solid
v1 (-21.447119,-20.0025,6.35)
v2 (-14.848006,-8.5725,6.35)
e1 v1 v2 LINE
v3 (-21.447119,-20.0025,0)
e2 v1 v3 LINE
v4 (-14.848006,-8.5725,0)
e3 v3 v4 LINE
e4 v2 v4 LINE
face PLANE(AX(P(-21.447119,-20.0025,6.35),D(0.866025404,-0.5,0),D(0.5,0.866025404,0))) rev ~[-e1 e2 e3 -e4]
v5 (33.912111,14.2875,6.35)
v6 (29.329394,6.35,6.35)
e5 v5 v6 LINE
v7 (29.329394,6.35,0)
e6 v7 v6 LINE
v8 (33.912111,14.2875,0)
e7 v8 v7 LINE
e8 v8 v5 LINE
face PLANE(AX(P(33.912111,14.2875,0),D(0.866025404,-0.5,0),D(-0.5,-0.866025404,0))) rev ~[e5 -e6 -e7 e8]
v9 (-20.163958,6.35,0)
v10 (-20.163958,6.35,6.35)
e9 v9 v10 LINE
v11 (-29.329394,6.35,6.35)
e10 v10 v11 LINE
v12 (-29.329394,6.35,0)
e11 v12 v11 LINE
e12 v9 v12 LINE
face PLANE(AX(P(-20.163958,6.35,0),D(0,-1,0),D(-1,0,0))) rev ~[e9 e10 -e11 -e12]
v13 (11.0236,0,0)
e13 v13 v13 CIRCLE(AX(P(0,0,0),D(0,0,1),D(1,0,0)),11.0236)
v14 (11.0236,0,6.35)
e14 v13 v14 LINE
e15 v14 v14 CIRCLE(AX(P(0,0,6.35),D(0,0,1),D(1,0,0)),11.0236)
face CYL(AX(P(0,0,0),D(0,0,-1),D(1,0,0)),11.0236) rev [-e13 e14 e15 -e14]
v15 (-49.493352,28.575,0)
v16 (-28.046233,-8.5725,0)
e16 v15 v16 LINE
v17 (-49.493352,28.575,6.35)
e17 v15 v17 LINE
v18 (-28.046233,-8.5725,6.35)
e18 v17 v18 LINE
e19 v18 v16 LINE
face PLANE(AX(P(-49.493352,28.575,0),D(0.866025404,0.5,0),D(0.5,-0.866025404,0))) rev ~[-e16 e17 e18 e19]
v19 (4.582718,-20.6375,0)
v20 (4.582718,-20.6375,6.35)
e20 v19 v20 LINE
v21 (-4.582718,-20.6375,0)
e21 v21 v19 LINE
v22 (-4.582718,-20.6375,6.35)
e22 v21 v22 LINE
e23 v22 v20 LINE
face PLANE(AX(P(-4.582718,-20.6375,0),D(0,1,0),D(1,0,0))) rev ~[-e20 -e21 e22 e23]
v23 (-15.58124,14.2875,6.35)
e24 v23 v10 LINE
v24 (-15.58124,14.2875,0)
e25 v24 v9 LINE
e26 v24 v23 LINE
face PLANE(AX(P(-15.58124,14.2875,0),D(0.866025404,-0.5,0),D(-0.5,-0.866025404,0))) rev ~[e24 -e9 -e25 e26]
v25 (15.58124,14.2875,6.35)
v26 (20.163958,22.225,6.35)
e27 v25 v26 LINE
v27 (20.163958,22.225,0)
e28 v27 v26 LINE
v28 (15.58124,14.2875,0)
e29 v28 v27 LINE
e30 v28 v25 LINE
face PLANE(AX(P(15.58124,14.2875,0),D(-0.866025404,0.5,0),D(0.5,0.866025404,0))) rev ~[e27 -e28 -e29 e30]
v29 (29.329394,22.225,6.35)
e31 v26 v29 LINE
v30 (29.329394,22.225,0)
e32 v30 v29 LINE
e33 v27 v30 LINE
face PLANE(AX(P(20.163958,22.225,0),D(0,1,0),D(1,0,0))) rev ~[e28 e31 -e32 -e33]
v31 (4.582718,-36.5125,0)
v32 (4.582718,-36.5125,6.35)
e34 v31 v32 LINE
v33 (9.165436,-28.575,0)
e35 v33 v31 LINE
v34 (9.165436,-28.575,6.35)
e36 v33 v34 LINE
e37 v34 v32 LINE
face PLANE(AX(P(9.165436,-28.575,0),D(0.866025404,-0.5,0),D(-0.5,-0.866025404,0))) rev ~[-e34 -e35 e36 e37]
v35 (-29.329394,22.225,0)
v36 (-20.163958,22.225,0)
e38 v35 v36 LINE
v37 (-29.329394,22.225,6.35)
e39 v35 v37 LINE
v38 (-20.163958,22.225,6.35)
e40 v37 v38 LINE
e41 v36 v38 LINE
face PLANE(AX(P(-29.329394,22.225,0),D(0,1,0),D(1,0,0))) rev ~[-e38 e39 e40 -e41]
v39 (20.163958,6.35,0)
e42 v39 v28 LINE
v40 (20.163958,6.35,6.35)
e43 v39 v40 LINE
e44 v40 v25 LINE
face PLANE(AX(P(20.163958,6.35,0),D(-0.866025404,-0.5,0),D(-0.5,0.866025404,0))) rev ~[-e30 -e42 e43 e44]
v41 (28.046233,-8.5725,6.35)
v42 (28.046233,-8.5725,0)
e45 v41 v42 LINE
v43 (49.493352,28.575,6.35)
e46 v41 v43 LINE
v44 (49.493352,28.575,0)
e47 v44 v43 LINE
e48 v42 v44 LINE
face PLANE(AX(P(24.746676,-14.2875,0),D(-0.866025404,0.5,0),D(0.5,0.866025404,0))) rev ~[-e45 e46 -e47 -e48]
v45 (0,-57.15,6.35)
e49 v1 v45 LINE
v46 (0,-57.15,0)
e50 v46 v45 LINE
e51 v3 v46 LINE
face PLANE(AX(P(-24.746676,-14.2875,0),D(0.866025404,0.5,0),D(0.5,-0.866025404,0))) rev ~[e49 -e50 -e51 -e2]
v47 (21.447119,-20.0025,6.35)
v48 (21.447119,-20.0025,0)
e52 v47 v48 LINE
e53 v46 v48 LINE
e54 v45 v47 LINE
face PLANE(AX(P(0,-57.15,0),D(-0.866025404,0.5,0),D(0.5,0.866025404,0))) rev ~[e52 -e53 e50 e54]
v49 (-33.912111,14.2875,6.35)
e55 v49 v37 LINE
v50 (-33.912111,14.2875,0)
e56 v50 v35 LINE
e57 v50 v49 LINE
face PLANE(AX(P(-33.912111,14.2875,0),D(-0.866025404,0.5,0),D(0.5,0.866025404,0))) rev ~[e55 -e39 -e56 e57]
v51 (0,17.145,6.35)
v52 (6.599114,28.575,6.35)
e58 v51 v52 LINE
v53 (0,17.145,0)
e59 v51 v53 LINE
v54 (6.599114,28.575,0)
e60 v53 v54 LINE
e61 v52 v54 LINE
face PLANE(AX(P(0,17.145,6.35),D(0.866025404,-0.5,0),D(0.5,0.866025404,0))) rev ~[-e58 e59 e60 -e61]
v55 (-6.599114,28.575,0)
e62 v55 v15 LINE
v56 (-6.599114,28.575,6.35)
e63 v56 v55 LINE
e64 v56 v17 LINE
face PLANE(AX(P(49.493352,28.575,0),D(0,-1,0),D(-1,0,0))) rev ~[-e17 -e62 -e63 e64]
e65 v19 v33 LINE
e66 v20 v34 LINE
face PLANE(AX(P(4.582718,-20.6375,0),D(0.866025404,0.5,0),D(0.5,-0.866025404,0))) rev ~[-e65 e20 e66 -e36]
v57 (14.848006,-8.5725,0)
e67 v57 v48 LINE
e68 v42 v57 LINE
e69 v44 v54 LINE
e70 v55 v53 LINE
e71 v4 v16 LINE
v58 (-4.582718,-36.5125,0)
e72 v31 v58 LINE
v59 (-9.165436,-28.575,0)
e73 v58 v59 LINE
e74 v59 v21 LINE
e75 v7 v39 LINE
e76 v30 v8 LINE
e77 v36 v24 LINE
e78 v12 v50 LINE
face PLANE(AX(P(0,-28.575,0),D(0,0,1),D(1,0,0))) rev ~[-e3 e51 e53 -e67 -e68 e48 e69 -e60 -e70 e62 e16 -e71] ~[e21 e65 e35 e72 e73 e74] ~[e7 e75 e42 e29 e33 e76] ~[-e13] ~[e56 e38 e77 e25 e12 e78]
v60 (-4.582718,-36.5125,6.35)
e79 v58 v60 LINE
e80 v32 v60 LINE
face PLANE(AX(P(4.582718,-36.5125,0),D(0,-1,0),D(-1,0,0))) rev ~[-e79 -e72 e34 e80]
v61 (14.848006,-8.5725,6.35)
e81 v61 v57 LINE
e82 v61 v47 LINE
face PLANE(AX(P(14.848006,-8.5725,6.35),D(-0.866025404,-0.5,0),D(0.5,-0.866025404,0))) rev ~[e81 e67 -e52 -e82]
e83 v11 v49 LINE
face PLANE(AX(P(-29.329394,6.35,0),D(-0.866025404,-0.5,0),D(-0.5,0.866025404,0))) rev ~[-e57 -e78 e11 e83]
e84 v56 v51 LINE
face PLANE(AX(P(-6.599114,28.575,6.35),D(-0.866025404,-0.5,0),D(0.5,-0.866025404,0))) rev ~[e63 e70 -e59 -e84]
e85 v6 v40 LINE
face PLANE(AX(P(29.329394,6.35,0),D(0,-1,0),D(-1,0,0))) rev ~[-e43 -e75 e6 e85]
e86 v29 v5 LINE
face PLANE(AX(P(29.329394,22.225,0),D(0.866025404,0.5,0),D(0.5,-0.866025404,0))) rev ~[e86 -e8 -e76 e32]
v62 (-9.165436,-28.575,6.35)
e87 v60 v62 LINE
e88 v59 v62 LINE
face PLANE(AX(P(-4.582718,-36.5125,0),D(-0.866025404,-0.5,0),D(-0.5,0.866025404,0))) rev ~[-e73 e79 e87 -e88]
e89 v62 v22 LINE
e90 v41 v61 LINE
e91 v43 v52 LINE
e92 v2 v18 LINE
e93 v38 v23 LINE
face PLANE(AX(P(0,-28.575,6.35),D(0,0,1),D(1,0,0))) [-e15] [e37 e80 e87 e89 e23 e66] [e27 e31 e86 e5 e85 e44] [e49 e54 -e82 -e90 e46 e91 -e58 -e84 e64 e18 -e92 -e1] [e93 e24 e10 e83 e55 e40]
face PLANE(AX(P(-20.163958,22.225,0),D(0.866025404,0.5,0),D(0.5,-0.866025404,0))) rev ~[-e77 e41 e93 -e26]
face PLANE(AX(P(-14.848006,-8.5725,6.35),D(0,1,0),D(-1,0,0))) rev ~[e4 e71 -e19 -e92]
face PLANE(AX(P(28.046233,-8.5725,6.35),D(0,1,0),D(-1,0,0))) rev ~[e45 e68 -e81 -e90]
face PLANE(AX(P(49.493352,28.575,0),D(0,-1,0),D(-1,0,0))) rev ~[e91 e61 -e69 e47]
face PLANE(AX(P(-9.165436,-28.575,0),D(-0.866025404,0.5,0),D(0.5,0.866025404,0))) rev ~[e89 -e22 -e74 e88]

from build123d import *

# Parameters (mm, degrees)
F0_R     = 11.0236
F1_DEPTH = 6.35
F3_DEPTH = 6.35


with BuildPart() as f1:
    # F0 (on Top) → F1 (new body)
    with BuildSketch(Plane.XY):
        Polygon((0, -57.15), (24.7466759131, -14.2875), (-24.7466759131, -14.2875), align=None)
        Polygon((-4.5827177617, -36.5125), (-9.1654355234, -28.575), (-4.5827177617, -20.6375), (4.5827177617, -20.6375), (9.1654355234, -28.575), (4.5827177617, -36.5125), align=None, mode=Mode.SUBTRACT)
        Polygon((-24.7466759131, -14.2875), (24.7466759131, -14.2875), (0, 28.575), align=None)
        Circle(F0_R, mode=Mode.SUBTRACT)
        Polygon((0, 28.575), (24.7466759131, -14.2875), (49.4933518263, 28.575), align=None)
        Polygon((33.9121114365, 14.2875), (29.3293936748, 6.35), (20.1639581514, 6.35), (15.5812403898, 14.2875), (20.1639581514, 22.225), (29.3293936748, 22.225), align=None, mode=Mode.SUBTRACT)
        Polygon((-49.4933518263, 28.575), (-24.7466759131, -14.2875), (0, 28.575), align=None)
        Polygon((-20.1639581514, 22.225), (-15.5812403898, 14.2875), (-20.1639581514, 6.35), (-29.3293936748, 6.35), (-33.9121114365, 14.2875), (-29.3293936748, 22.225), align=None, mode=Mode.SUBTRACT)
    extrude(amount=F1_DEPTH)

    # F2 (on face) → F3 (cut)
    with BuildSketch(Plane.XY.offset(6.35)):
        Polygon((6.5991135768, 28.575), (-6.5991135768, 28.575), (0, 17.145), align=None)
        Polygon((-14.8480055479, -8.5725), (-28.0462327016, -8.5725), (-21.4471191247, -20.0025), align=None)
        Polygon((21.4471191247, -20.0025), (28.0462327016, -8.5725), (14.8480055479, -8.5725), align=None)
    extrude(amount=-F3_DEPTH, mode=Mode.SUBTRACT)


solid = f1.part
